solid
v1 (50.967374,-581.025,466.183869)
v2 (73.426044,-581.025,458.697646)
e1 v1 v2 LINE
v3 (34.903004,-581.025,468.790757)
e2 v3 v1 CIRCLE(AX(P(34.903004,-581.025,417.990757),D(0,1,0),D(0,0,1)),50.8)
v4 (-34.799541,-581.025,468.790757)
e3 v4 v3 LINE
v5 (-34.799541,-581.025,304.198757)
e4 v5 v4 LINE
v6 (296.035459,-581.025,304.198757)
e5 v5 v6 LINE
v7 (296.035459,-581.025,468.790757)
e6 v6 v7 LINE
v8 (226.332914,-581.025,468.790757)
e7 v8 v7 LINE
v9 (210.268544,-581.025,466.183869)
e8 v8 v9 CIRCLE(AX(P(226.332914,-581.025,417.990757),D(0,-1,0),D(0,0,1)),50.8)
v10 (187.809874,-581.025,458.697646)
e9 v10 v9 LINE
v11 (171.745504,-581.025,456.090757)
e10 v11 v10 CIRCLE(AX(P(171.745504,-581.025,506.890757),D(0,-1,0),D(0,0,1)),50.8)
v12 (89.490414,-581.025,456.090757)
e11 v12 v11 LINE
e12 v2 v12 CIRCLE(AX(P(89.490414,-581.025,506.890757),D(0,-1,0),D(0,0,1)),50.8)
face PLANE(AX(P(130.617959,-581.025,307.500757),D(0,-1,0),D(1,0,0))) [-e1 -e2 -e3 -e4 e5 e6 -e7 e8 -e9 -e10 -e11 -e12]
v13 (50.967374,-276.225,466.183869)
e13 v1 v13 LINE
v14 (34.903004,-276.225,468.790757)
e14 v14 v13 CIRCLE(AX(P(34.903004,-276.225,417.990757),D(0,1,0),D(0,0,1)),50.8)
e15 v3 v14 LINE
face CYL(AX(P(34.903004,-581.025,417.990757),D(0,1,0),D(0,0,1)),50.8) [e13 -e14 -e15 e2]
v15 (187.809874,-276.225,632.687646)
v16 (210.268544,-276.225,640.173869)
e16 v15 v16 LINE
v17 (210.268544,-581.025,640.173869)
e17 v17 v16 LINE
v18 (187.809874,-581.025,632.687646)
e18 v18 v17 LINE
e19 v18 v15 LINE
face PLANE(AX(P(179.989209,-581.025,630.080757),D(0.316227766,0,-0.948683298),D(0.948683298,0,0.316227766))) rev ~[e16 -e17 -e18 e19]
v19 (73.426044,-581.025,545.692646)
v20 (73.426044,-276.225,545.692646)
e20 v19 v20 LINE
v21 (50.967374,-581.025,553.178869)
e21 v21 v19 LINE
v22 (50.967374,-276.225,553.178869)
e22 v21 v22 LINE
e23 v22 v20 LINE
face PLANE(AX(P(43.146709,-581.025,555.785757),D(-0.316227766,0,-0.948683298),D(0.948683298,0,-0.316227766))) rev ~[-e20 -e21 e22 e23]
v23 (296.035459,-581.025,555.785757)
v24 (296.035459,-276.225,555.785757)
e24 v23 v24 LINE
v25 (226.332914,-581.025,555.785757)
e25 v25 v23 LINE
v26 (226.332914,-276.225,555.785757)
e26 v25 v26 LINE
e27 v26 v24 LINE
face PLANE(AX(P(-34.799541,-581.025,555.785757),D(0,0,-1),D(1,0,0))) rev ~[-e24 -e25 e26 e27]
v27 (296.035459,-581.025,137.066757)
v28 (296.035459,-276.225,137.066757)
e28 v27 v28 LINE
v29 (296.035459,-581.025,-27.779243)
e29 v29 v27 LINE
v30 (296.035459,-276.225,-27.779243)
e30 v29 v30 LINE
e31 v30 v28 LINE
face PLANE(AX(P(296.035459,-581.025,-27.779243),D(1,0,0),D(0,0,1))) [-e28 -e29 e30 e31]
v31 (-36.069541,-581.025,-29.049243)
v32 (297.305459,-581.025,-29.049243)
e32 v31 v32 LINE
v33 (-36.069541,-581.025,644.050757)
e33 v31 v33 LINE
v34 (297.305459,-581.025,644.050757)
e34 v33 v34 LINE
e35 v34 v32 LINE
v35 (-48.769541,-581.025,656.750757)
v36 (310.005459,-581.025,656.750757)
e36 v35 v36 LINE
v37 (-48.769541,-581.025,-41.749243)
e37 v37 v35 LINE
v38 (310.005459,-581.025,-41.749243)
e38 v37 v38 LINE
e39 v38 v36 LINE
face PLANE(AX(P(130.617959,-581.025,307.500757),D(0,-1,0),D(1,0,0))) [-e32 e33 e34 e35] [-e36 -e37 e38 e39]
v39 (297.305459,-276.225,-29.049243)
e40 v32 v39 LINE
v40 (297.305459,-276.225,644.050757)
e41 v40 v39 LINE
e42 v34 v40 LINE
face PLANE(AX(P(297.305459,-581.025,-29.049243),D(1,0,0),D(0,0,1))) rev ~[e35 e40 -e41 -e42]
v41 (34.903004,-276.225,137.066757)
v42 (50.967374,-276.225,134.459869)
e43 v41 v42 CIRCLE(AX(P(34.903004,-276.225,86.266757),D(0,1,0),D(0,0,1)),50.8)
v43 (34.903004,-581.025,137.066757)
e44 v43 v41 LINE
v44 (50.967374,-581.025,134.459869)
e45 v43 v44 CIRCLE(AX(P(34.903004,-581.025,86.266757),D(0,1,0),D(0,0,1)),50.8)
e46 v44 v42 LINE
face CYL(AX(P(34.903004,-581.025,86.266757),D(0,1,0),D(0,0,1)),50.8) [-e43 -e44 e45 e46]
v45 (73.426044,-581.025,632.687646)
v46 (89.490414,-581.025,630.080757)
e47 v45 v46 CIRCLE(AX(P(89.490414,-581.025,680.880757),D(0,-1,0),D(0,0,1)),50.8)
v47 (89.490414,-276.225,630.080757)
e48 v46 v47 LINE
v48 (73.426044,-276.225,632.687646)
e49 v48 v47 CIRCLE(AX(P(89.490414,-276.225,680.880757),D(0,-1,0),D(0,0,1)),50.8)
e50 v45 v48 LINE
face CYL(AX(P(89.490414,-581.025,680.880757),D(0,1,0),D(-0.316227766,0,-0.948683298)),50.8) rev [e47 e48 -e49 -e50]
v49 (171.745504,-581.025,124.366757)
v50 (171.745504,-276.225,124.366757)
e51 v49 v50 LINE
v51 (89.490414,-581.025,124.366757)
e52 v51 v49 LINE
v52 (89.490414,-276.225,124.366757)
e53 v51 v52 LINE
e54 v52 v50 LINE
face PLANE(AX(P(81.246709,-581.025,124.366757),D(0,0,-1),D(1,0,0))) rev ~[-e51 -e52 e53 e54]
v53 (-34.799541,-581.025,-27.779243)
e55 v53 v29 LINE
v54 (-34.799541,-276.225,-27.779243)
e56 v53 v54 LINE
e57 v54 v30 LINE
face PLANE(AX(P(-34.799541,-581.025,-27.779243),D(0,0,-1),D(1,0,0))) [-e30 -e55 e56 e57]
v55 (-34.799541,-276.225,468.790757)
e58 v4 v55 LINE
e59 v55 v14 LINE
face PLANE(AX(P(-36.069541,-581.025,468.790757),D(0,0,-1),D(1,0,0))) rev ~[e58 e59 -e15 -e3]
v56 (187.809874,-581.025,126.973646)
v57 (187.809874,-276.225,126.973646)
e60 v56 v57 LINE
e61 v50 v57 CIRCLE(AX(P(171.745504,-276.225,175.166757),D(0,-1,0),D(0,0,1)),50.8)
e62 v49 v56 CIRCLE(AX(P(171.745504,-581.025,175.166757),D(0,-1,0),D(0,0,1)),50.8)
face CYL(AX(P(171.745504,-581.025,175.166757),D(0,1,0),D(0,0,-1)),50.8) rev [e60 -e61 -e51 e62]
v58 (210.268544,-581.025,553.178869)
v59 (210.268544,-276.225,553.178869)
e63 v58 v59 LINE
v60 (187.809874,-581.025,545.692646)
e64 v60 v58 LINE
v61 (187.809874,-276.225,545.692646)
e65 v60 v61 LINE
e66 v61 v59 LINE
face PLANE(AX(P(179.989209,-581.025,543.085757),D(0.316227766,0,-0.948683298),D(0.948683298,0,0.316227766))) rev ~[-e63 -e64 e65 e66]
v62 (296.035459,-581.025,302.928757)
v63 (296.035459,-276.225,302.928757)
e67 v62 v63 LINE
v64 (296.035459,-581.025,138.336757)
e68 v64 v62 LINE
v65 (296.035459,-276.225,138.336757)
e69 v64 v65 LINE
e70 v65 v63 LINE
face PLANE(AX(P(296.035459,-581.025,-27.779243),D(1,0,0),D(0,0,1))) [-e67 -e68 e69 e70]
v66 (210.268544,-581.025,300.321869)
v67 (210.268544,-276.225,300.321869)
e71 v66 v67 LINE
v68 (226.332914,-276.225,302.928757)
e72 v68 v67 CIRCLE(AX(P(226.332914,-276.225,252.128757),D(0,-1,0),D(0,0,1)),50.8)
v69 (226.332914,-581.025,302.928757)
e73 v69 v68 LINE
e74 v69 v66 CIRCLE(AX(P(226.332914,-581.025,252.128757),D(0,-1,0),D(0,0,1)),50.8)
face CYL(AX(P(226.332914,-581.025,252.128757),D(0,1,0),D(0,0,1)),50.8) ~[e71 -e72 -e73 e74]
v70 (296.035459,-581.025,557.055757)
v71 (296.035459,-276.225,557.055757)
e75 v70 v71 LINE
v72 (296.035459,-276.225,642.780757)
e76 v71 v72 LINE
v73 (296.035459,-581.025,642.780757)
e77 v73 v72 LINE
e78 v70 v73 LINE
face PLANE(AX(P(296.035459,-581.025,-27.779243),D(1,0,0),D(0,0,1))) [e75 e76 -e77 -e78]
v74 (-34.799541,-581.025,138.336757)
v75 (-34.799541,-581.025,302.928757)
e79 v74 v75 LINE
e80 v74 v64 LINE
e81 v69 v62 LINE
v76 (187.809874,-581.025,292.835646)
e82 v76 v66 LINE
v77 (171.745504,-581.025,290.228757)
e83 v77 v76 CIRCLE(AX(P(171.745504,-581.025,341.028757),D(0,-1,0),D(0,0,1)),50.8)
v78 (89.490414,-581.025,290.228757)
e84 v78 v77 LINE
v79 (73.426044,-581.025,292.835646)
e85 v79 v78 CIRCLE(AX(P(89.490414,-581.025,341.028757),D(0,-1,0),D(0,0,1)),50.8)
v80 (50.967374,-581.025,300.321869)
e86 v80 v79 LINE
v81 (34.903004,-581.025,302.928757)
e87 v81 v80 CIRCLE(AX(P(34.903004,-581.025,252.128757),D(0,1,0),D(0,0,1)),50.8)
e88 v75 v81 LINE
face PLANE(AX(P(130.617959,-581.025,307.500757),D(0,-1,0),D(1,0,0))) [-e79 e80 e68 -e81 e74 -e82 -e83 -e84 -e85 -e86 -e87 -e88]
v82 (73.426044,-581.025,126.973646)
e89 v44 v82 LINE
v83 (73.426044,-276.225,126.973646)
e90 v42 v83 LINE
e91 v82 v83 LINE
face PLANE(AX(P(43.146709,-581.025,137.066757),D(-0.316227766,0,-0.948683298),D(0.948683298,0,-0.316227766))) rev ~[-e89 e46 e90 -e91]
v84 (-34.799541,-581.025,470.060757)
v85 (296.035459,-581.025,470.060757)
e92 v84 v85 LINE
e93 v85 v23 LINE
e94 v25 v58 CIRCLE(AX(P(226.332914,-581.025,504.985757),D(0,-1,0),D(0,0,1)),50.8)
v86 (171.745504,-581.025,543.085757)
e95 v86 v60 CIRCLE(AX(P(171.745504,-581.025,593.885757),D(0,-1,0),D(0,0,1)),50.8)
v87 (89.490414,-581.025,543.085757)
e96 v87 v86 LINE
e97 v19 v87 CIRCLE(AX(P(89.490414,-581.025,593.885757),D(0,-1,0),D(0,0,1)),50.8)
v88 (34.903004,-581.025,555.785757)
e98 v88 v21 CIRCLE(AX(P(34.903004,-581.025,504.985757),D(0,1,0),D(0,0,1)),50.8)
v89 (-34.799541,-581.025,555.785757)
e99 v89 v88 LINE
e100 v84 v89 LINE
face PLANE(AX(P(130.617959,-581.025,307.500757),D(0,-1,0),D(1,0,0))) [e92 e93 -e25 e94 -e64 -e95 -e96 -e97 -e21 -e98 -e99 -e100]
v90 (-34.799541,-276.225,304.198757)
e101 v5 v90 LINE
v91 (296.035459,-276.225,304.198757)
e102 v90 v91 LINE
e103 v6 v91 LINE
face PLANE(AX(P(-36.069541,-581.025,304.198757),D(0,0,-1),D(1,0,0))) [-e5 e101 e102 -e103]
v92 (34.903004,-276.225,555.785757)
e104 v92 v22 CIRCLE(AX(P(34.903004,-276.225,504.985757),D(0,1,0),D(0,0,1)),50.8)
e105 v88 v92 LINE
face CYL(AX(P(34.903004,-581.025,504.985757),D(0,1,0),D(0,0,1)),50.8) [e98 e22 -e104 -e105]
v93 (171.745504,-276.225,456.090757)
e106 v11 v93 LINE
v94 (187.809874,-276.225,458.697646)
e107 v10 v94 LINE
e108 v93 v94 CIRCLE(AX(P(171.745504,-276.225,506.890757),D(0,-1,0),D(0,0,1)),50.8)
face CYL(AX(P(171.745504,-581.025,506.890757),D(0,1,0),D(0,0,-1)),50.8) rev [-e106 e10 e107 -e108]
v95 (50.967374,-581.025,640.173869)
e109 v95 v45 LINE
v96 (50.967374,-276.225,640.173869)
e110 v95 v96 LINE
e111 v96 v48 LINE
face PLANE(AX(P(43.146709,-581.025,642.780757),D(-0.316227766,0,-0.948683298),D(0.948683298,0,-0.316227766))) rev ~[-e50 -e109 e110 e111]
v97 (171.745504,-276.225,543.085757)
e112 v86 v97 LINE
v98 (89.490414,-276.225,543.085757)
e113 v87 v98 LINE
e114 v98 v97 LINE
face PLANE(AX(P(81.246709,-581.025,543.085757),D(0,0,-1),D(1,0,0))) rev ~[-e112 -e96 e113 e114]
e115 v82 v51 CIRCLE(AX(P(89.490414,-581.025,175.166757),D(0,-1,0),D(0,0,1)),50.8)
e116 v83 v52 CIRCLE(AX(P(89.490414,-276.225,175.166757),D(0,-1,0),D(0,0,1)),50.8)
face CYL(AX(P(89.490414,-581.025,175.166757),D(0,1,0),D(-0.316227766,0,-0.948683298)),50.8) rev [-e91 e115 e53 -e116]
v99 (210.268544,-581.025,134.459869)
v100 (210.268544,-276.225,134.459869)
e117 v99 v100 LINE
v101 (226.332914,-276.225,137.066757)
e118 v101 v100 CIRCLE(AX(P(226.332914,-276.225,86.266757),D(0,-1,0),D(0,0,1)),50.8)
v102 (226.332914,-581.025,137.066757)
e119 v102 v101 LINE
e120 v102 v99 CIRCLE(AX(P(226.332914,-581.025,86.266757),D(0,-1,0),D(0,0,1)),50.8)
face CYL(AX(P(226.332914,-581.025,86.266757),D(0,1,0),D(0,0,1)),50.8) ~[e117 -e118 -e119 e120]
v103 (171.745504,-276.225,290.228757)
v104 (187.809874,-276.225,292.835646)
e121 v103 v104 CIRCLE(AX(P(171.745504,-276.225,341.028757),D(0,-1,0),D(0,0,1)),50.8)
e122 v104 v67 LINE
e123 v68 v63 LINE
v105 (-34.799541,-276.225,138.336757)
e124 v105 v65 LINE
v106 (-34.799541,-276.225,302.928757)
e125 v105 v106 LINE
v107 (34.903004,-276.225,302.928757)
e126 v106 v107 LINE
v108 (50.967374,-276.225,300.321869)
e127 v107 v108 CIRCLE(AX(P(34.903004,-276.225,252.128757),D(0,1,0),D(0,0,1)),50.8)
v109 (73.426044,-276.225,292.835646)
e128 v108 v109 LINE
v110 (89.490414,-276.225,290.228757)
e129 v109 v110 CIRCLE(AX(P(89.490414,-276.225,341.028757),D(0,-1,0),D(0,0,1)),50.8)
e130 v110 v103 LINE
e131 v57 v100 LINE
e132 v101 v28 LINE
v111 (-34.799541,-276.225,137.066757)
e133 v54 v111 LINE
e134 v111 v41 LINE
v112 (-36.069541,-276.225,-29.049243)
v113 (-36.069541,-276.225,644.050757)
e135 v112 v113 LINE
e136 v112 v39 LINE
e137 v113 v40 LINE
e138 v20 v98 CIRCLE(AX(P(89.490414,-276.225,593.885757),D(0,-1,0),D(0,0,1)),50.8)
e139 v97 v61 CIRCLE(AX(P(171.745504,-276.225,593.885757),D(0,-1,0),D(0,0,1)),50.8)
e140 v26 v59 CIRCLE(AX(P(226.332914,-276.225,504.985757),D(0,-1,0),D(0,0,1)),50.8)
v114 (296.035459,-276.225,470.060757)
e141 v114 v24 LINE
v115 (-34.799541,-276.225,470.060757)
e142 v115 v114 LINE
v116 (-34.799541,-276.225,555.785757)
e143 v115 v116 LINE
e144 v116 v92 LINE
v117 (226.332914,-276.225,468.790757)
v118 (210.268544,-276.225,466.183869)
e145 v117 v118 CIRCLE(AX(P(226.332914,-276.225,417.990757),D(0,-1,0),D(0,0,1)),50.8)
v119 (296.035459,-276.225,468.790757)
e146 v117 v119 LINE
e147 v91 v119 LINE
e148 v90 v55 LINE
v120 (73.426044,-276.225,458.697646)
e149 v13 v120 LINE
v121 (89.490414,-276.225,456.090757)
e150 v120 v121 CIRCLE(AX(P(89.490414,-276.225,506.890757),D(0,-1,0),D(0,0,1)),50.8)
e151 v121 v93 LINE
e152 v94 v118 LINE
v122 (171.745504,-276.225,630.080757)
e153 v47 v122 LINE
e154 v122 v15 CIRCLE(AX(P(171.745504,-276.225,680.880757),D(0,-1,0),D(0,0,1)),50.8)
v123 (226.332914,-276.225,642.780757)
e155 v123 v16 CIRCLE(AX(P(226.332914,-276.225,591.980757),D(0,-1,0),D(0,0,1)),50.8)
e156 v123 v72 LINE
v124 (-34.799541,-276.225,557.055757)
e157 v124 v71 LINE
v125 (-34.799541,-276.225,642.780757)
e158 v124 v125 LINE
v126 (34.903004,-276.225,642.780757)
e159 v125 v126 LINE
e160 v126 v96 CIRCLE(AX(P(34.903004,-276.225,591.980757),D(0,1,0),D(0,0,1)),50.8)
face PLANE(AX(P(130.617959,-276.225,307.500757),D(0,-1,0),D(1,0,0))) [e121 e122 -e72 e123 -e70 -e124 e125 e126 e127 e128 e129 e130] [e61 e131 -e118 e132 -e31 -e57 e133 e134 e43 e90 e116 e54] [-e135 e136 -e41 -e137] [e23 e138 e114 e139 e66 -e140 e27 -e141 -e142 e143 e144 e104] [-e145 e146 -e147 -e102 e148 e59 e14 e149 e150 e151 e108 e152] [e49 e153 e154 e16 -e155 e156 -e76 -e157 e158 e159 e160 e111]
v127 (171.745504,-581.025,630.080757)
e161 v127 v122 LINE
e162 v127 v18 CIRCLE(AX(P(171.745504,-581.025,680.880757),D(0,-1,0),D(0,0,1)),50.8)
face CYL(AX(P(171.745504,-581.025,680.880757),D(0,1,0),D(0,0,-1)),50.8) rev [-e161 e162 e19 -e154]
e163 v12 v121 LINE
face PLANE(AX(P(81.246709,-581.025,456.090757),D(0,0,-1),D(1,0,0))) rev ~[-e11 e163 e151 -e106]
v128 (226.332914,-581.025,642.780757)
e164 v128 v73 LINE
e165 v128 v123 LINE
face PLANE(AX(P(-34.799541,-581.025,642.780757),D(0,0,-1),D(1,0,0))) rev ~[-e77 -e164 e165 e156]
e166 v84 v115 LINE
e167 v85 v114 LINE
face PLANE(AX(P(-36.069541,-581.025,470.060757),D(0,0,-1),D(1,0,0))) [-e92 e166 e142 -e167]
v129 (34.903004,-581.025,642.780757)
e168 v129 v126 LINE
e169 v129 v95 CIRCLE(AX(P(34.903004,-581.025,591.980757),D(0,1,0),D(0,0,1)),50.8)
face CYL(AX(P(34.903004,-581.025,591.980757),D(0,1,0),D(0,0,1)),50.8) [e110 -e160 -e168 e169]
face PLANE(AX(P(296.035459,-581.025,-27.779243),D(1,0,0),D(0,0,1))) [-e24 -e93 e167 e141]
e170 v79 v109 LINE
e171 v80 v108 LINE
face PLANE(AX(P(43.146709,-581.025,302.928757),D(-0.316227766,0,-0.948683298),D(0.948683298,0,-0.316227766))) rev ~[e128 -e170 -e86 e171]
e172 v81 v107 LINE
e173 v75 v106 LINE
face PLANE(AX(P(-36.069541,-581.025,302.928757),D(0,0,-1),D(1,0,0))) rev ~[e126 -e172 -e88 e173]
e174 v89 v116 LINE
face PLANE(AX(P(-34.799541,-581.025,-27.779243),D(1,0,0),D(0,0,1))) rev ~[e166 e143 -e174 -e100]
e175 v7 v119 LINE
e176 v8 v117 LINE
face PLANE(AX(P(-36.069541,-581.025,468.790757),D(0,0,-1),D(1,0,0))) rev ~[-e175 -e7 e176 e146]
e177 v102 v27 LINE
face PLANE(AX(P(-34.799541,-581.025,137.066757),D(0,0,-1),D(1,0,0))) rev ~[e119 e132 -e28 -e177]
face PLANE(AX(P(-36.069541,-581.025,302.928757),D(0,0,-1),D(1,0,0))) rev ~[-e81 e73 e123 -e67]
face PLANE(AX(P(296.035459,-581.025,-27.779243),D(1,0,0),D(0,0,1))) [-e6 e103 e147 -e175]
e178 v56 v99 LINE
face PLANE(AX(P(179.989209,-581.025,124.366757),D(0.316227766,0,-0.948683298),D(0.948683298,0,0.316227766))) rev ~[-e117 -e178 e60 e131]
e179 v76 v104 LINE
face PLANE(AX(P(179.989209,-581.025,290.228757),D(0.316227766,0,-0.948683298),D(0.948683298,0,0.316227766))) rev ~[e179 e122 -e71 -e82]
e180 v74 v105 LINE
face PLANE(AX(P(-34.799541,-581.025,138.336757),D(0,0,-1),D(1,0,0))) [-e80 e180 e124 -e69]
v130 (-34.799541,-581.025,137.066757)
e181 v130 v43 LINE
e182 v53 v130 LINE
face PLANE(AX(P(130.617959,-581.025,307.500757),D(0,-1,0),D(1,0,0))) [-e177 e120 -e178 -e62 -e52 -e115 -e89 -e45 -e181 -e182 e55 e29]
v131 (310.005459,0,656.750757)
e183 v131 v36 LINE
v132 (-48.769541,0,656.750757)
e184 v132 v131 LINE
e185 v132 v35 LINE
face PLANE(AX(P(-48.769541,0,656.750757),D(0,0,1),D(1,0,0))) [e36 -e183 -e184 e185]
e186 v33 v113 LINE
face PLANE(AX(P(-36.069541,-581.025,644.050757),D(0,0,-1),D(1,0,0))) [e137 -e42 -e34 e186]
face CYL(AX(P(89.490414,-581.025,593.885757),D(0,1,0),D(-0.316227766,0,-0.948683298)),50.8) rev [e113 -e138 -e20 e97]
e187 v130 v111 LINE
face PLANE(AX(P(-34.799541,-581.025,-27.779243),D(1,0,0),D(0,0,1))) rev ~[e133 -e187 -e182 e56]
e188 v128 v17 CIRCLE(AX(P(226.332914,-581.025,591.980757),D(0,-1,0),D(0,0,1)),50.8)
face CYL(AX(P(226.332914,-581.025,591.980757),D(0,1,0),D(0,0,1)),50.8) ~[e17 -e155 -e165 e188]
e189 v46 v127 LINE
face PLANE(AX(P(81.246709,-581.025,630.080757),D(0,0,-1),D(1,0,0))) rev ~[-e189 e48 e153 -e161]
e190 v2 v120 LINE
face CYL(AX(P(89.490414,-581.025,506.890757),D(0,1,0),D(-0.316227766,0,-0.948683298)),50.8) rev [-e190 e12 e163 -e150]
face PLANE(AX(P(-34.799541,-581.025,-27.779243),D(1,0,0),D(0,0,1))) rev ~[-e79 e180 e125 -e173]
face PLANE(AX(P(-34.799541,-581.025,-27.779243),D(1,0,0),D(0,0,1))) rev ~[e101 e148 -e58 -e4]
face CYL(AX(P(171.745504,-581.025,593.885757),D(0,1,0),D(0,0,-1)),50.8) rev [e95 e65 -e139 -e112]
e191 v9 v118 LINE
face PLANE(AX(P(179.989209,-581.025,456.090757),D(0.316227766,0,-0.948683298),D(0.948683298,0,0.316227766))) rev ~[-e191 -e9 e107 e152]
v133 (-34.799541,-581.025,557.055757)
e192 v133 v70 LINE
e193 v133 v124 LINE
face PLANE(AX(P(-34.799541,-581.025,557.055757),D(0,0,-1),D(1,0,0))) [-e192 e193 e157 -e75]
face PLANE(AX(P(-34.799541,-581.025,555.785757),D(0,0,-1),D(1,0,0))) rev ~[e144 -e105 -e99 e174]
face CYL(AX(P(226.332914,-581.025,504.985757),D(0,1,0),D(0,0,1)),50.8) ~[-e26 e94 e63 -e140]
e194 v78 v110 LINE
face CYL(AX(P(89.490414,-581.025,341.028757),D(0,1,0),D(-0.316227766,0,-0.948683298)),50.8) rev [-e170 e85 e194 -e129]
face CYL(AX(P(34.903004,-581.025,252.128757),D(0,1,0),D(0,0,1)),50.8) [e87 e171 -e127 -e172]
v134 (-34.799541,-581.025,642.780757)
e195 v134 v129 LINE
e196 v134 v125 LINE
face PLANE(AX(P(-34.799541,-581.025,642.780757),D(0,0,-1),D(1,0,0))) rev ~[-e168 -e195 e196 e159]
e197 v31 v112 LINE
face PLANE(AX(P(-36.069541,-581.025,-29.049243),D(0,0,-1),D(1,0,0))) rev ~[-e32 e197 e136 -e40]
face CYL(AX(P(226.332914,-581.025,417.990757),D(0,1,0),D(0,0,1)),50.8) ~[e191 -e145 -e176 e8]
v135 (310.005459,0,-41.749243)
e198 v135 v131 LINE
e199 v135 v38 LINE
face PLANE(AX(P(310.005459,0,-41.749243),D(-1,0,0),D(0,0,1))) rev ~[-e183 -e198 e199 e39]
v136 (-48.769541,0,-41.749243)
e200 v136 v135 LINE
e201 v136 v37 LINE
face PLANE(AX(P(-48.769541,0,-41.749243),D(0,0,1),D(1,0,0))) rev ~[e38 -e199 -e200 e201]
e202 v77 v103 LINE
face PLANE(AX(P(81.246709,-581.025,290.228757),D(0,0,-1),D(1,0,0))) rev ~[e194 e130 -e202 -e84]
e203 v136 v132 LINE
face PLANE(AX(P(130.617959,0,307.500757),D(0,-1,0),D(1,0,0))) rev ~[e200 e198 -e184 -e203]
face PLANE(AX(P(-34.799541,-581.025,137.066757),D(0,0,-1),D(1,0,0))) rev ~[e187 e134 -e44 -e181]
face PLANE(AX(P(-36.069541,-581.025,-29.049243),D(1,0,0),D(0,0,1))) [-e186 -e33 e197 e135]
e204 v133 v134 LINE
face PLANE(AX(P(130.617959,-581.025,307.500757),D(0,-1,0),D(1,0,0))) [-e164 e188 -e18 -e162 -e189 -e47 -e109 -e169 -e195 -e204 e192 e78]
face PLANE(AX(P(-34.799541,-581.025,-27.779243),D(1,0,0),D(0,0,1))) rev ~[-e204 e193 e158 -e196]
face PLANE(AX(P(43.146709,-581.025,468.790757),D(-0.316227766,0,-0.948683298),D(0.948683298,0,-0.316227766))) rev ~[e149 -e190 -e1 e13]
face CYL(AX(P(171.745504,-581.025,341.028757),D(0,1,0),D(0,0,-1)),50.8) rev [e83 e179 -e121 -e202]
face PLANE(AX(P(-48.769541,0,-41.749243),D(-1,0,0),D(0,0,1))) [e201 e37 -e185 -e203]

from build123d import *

# Parameters (mm, degrees)
F0_W      = 358.775
F0_H      = 698.5
F1_DEPTH  = 581.025
F2_W      = 333.375
F2_H      = 673.1
F2_W_2    = 330.835
F2_H_2    = 670.56
F3_DEPTH  = 304.8
F4_W      = 330.835
F4_H      = 1.27
F4_W_2    = 333.375
F4_W_3    = 332.105
F5_DEPTH  = 304.8
F7_DEPTH  = 304.8
F8_R      = 50.8
F10_DEPTH = 304.8
F11_R     = 50.8
F13_DEPTH = 304.8
F14_R     = 50.8
F16_DEPTH = 304.8
F17_R     = 50.8
F19_DEPTH = 304.8
F20_R     = 50.8


with BuildPart() as f1:
    # F0 (on Front) → F1 (new body)
    with BuildSketch(Plane.XZ):
        with Locations((130.6179589152, 307.5007573068)):
            Rectangle(F0_W, F0_H)
    extrude(amount=F1_DEPTH)

    # F2 (on face) → F3 (cut)
    with BuildSketch(Plane.XZ.offset(581.025)):
        with Locations((130.6179589152, 307.5007573068)):
            Rectangle(F2_W, F2_H)
        with Locations((130.6179589152, 307.5007573068)):
            Rectangle(F2_W_2, F2_H_2, mode=Mode.SUBTRACT)
    extrude(amount=-F3_DEPTH, mode=Mode.SUBTRACT)

    # F4 (on face) → F5 (cut)
    with BuildSketch(Plane.XZ.offset(581.025)):
        with Locations((130.6179589152, 556.4207573068)):
            Rectangle(F4_W, F4_H)
        with Locations((130.6179589152, 469.4257573068)):
            Rectangle(F4_W_2, F4_H)
        with Locations((129.9829589152, 303.5637573068)):
            Rectangle(F4_W_3, F4_H)
        with Locations((131.2529589152, 137.7017573068)):
            Rectangle(F4_W_3, F4_H)
    extrude(amount=-F5_DEPTH, mode=Mode.SUBTRACT)

    # F6 (on face) → F7 (cut)
    with BuildSketch(Plane.XZ.offset(581.025)):
        Polygon((218.0892089152, 642.7807573068), (43.1467089152, 642.7807573068), (81.2467089152, 630.0807573068), (179.9892089152, 630.0807573068), align=None)
    extrude(amount=-F7_DEPTH, mode=Mode.SUBTRACT)

    # F8
    f8_edges = [f1.edges().sort_by_distance(p)[0] for p in [
        (43.146709, -428.625, 642.780757),
        (81.246709, -428.625, 630.080757),
        (179.989209, -428.625, 630.080757),
        (218.089209, -428.625, 642.780757),
    ]]
    fillet(f8_edges, radius=F8_R)

    # F9 (on face) → F10 (cut)
    with BuildSketch(Plane.XZ.offset(581.025)):
        Polygon((218.0892089152, 555.7857573068), (43.1467089152, 555.7857573068), (81.2467089152, 543.0857573068), (179.9892089152, 543.0857573068), align=None)
    extrude(amount=-F10_DEPTH, mode=Mode.SUBTRACT)

    # F11
    f11_edges = [f1.edges().sort_by_distance(p)[0] for p in [
        (43.146709, -428.625, 555.785757),
        (81.246709, -428.625, 543.085757),
        (218.089209, -428.625, 555.785757),
        (179.989209, -428.625, 543.085757),
    ]]
    fillet(f11_edges, radius=F11_R)

    # F12 (on face) → F13 (cut)
    with BuildSketch(Plane.XZ.offset(581.025)):
        Polygon((218.0892089152, 468.7907573068), (43.1467089152, 468.7907573068), (81.2467089152, 456.0907573068), (179.9892089152, 456.0907573068), align=None)
    extrude(amount=-F13_DEPTH, mode=Mode.SUBTRACT)

    # F14
    f14_edges = [f1.edges().sort_by_distance(p)[0] for p in [
        (43.146709, -428.625, 468.790757),
        (81.246709, -428.625, 456.090757),
        (179.989209, -428.625, 456.090757),
        (218.089209, -428.625, 468.790757),
    ]]
    fillet(f14_edges, radius=F14_R)

    # F15 (on face) → F16 (cut)
    with BuildSketch(Plane.XZ.offset(581.025)):
        Polygon((218.0892089152, 302.9287573068), (43.1467089152, 302.9287573068), (81.2467089152, 290.2287573068), (179.9892089152, 290.2287573068), align=None)
    extrude(amount=-F16_DEPTH, mode=Mode.SUBTRACT)

    # F17
    f17_edges = [f1.edges().sort_by_distance(p)[0] for p in [
        (43.146709, -428.625, 302.928757),
        (81.246709, -428.625, 290.228757),
        (179.989209, -428.625, 290.228757),
        (218.089209, -428.625, 302.928757),
    ]]
    fillet(f17_edges, radius=F17_R)

    # F18 (on face) → F19 (cut)
    with BuildSketch(Plane.XZ.offset(581.025)):
        Polygon((218.0892089152, 137.0667573068), (43.1467089152, 137.0667573068), (81.2467089152, 124.3667573068), (179.9892089152, 124.3667573068), align=None)
    extrude(amount=-F19_DEPTH, mode=Mode.SUBTRACT)

    # F20
    f20_edges = [f1.edges().sort_by_distance(p)[0] for p in [
        (43.146709, -428.625, 137.066757),
        (81.246709, -428.625, 124.366757),
        (179.989209, -428.625, 124.366757),
        (218.089209, -428.625, 137.066757),
    ]]
    fillet(f20_edges, radius=F20_R)


solid = f1.part
